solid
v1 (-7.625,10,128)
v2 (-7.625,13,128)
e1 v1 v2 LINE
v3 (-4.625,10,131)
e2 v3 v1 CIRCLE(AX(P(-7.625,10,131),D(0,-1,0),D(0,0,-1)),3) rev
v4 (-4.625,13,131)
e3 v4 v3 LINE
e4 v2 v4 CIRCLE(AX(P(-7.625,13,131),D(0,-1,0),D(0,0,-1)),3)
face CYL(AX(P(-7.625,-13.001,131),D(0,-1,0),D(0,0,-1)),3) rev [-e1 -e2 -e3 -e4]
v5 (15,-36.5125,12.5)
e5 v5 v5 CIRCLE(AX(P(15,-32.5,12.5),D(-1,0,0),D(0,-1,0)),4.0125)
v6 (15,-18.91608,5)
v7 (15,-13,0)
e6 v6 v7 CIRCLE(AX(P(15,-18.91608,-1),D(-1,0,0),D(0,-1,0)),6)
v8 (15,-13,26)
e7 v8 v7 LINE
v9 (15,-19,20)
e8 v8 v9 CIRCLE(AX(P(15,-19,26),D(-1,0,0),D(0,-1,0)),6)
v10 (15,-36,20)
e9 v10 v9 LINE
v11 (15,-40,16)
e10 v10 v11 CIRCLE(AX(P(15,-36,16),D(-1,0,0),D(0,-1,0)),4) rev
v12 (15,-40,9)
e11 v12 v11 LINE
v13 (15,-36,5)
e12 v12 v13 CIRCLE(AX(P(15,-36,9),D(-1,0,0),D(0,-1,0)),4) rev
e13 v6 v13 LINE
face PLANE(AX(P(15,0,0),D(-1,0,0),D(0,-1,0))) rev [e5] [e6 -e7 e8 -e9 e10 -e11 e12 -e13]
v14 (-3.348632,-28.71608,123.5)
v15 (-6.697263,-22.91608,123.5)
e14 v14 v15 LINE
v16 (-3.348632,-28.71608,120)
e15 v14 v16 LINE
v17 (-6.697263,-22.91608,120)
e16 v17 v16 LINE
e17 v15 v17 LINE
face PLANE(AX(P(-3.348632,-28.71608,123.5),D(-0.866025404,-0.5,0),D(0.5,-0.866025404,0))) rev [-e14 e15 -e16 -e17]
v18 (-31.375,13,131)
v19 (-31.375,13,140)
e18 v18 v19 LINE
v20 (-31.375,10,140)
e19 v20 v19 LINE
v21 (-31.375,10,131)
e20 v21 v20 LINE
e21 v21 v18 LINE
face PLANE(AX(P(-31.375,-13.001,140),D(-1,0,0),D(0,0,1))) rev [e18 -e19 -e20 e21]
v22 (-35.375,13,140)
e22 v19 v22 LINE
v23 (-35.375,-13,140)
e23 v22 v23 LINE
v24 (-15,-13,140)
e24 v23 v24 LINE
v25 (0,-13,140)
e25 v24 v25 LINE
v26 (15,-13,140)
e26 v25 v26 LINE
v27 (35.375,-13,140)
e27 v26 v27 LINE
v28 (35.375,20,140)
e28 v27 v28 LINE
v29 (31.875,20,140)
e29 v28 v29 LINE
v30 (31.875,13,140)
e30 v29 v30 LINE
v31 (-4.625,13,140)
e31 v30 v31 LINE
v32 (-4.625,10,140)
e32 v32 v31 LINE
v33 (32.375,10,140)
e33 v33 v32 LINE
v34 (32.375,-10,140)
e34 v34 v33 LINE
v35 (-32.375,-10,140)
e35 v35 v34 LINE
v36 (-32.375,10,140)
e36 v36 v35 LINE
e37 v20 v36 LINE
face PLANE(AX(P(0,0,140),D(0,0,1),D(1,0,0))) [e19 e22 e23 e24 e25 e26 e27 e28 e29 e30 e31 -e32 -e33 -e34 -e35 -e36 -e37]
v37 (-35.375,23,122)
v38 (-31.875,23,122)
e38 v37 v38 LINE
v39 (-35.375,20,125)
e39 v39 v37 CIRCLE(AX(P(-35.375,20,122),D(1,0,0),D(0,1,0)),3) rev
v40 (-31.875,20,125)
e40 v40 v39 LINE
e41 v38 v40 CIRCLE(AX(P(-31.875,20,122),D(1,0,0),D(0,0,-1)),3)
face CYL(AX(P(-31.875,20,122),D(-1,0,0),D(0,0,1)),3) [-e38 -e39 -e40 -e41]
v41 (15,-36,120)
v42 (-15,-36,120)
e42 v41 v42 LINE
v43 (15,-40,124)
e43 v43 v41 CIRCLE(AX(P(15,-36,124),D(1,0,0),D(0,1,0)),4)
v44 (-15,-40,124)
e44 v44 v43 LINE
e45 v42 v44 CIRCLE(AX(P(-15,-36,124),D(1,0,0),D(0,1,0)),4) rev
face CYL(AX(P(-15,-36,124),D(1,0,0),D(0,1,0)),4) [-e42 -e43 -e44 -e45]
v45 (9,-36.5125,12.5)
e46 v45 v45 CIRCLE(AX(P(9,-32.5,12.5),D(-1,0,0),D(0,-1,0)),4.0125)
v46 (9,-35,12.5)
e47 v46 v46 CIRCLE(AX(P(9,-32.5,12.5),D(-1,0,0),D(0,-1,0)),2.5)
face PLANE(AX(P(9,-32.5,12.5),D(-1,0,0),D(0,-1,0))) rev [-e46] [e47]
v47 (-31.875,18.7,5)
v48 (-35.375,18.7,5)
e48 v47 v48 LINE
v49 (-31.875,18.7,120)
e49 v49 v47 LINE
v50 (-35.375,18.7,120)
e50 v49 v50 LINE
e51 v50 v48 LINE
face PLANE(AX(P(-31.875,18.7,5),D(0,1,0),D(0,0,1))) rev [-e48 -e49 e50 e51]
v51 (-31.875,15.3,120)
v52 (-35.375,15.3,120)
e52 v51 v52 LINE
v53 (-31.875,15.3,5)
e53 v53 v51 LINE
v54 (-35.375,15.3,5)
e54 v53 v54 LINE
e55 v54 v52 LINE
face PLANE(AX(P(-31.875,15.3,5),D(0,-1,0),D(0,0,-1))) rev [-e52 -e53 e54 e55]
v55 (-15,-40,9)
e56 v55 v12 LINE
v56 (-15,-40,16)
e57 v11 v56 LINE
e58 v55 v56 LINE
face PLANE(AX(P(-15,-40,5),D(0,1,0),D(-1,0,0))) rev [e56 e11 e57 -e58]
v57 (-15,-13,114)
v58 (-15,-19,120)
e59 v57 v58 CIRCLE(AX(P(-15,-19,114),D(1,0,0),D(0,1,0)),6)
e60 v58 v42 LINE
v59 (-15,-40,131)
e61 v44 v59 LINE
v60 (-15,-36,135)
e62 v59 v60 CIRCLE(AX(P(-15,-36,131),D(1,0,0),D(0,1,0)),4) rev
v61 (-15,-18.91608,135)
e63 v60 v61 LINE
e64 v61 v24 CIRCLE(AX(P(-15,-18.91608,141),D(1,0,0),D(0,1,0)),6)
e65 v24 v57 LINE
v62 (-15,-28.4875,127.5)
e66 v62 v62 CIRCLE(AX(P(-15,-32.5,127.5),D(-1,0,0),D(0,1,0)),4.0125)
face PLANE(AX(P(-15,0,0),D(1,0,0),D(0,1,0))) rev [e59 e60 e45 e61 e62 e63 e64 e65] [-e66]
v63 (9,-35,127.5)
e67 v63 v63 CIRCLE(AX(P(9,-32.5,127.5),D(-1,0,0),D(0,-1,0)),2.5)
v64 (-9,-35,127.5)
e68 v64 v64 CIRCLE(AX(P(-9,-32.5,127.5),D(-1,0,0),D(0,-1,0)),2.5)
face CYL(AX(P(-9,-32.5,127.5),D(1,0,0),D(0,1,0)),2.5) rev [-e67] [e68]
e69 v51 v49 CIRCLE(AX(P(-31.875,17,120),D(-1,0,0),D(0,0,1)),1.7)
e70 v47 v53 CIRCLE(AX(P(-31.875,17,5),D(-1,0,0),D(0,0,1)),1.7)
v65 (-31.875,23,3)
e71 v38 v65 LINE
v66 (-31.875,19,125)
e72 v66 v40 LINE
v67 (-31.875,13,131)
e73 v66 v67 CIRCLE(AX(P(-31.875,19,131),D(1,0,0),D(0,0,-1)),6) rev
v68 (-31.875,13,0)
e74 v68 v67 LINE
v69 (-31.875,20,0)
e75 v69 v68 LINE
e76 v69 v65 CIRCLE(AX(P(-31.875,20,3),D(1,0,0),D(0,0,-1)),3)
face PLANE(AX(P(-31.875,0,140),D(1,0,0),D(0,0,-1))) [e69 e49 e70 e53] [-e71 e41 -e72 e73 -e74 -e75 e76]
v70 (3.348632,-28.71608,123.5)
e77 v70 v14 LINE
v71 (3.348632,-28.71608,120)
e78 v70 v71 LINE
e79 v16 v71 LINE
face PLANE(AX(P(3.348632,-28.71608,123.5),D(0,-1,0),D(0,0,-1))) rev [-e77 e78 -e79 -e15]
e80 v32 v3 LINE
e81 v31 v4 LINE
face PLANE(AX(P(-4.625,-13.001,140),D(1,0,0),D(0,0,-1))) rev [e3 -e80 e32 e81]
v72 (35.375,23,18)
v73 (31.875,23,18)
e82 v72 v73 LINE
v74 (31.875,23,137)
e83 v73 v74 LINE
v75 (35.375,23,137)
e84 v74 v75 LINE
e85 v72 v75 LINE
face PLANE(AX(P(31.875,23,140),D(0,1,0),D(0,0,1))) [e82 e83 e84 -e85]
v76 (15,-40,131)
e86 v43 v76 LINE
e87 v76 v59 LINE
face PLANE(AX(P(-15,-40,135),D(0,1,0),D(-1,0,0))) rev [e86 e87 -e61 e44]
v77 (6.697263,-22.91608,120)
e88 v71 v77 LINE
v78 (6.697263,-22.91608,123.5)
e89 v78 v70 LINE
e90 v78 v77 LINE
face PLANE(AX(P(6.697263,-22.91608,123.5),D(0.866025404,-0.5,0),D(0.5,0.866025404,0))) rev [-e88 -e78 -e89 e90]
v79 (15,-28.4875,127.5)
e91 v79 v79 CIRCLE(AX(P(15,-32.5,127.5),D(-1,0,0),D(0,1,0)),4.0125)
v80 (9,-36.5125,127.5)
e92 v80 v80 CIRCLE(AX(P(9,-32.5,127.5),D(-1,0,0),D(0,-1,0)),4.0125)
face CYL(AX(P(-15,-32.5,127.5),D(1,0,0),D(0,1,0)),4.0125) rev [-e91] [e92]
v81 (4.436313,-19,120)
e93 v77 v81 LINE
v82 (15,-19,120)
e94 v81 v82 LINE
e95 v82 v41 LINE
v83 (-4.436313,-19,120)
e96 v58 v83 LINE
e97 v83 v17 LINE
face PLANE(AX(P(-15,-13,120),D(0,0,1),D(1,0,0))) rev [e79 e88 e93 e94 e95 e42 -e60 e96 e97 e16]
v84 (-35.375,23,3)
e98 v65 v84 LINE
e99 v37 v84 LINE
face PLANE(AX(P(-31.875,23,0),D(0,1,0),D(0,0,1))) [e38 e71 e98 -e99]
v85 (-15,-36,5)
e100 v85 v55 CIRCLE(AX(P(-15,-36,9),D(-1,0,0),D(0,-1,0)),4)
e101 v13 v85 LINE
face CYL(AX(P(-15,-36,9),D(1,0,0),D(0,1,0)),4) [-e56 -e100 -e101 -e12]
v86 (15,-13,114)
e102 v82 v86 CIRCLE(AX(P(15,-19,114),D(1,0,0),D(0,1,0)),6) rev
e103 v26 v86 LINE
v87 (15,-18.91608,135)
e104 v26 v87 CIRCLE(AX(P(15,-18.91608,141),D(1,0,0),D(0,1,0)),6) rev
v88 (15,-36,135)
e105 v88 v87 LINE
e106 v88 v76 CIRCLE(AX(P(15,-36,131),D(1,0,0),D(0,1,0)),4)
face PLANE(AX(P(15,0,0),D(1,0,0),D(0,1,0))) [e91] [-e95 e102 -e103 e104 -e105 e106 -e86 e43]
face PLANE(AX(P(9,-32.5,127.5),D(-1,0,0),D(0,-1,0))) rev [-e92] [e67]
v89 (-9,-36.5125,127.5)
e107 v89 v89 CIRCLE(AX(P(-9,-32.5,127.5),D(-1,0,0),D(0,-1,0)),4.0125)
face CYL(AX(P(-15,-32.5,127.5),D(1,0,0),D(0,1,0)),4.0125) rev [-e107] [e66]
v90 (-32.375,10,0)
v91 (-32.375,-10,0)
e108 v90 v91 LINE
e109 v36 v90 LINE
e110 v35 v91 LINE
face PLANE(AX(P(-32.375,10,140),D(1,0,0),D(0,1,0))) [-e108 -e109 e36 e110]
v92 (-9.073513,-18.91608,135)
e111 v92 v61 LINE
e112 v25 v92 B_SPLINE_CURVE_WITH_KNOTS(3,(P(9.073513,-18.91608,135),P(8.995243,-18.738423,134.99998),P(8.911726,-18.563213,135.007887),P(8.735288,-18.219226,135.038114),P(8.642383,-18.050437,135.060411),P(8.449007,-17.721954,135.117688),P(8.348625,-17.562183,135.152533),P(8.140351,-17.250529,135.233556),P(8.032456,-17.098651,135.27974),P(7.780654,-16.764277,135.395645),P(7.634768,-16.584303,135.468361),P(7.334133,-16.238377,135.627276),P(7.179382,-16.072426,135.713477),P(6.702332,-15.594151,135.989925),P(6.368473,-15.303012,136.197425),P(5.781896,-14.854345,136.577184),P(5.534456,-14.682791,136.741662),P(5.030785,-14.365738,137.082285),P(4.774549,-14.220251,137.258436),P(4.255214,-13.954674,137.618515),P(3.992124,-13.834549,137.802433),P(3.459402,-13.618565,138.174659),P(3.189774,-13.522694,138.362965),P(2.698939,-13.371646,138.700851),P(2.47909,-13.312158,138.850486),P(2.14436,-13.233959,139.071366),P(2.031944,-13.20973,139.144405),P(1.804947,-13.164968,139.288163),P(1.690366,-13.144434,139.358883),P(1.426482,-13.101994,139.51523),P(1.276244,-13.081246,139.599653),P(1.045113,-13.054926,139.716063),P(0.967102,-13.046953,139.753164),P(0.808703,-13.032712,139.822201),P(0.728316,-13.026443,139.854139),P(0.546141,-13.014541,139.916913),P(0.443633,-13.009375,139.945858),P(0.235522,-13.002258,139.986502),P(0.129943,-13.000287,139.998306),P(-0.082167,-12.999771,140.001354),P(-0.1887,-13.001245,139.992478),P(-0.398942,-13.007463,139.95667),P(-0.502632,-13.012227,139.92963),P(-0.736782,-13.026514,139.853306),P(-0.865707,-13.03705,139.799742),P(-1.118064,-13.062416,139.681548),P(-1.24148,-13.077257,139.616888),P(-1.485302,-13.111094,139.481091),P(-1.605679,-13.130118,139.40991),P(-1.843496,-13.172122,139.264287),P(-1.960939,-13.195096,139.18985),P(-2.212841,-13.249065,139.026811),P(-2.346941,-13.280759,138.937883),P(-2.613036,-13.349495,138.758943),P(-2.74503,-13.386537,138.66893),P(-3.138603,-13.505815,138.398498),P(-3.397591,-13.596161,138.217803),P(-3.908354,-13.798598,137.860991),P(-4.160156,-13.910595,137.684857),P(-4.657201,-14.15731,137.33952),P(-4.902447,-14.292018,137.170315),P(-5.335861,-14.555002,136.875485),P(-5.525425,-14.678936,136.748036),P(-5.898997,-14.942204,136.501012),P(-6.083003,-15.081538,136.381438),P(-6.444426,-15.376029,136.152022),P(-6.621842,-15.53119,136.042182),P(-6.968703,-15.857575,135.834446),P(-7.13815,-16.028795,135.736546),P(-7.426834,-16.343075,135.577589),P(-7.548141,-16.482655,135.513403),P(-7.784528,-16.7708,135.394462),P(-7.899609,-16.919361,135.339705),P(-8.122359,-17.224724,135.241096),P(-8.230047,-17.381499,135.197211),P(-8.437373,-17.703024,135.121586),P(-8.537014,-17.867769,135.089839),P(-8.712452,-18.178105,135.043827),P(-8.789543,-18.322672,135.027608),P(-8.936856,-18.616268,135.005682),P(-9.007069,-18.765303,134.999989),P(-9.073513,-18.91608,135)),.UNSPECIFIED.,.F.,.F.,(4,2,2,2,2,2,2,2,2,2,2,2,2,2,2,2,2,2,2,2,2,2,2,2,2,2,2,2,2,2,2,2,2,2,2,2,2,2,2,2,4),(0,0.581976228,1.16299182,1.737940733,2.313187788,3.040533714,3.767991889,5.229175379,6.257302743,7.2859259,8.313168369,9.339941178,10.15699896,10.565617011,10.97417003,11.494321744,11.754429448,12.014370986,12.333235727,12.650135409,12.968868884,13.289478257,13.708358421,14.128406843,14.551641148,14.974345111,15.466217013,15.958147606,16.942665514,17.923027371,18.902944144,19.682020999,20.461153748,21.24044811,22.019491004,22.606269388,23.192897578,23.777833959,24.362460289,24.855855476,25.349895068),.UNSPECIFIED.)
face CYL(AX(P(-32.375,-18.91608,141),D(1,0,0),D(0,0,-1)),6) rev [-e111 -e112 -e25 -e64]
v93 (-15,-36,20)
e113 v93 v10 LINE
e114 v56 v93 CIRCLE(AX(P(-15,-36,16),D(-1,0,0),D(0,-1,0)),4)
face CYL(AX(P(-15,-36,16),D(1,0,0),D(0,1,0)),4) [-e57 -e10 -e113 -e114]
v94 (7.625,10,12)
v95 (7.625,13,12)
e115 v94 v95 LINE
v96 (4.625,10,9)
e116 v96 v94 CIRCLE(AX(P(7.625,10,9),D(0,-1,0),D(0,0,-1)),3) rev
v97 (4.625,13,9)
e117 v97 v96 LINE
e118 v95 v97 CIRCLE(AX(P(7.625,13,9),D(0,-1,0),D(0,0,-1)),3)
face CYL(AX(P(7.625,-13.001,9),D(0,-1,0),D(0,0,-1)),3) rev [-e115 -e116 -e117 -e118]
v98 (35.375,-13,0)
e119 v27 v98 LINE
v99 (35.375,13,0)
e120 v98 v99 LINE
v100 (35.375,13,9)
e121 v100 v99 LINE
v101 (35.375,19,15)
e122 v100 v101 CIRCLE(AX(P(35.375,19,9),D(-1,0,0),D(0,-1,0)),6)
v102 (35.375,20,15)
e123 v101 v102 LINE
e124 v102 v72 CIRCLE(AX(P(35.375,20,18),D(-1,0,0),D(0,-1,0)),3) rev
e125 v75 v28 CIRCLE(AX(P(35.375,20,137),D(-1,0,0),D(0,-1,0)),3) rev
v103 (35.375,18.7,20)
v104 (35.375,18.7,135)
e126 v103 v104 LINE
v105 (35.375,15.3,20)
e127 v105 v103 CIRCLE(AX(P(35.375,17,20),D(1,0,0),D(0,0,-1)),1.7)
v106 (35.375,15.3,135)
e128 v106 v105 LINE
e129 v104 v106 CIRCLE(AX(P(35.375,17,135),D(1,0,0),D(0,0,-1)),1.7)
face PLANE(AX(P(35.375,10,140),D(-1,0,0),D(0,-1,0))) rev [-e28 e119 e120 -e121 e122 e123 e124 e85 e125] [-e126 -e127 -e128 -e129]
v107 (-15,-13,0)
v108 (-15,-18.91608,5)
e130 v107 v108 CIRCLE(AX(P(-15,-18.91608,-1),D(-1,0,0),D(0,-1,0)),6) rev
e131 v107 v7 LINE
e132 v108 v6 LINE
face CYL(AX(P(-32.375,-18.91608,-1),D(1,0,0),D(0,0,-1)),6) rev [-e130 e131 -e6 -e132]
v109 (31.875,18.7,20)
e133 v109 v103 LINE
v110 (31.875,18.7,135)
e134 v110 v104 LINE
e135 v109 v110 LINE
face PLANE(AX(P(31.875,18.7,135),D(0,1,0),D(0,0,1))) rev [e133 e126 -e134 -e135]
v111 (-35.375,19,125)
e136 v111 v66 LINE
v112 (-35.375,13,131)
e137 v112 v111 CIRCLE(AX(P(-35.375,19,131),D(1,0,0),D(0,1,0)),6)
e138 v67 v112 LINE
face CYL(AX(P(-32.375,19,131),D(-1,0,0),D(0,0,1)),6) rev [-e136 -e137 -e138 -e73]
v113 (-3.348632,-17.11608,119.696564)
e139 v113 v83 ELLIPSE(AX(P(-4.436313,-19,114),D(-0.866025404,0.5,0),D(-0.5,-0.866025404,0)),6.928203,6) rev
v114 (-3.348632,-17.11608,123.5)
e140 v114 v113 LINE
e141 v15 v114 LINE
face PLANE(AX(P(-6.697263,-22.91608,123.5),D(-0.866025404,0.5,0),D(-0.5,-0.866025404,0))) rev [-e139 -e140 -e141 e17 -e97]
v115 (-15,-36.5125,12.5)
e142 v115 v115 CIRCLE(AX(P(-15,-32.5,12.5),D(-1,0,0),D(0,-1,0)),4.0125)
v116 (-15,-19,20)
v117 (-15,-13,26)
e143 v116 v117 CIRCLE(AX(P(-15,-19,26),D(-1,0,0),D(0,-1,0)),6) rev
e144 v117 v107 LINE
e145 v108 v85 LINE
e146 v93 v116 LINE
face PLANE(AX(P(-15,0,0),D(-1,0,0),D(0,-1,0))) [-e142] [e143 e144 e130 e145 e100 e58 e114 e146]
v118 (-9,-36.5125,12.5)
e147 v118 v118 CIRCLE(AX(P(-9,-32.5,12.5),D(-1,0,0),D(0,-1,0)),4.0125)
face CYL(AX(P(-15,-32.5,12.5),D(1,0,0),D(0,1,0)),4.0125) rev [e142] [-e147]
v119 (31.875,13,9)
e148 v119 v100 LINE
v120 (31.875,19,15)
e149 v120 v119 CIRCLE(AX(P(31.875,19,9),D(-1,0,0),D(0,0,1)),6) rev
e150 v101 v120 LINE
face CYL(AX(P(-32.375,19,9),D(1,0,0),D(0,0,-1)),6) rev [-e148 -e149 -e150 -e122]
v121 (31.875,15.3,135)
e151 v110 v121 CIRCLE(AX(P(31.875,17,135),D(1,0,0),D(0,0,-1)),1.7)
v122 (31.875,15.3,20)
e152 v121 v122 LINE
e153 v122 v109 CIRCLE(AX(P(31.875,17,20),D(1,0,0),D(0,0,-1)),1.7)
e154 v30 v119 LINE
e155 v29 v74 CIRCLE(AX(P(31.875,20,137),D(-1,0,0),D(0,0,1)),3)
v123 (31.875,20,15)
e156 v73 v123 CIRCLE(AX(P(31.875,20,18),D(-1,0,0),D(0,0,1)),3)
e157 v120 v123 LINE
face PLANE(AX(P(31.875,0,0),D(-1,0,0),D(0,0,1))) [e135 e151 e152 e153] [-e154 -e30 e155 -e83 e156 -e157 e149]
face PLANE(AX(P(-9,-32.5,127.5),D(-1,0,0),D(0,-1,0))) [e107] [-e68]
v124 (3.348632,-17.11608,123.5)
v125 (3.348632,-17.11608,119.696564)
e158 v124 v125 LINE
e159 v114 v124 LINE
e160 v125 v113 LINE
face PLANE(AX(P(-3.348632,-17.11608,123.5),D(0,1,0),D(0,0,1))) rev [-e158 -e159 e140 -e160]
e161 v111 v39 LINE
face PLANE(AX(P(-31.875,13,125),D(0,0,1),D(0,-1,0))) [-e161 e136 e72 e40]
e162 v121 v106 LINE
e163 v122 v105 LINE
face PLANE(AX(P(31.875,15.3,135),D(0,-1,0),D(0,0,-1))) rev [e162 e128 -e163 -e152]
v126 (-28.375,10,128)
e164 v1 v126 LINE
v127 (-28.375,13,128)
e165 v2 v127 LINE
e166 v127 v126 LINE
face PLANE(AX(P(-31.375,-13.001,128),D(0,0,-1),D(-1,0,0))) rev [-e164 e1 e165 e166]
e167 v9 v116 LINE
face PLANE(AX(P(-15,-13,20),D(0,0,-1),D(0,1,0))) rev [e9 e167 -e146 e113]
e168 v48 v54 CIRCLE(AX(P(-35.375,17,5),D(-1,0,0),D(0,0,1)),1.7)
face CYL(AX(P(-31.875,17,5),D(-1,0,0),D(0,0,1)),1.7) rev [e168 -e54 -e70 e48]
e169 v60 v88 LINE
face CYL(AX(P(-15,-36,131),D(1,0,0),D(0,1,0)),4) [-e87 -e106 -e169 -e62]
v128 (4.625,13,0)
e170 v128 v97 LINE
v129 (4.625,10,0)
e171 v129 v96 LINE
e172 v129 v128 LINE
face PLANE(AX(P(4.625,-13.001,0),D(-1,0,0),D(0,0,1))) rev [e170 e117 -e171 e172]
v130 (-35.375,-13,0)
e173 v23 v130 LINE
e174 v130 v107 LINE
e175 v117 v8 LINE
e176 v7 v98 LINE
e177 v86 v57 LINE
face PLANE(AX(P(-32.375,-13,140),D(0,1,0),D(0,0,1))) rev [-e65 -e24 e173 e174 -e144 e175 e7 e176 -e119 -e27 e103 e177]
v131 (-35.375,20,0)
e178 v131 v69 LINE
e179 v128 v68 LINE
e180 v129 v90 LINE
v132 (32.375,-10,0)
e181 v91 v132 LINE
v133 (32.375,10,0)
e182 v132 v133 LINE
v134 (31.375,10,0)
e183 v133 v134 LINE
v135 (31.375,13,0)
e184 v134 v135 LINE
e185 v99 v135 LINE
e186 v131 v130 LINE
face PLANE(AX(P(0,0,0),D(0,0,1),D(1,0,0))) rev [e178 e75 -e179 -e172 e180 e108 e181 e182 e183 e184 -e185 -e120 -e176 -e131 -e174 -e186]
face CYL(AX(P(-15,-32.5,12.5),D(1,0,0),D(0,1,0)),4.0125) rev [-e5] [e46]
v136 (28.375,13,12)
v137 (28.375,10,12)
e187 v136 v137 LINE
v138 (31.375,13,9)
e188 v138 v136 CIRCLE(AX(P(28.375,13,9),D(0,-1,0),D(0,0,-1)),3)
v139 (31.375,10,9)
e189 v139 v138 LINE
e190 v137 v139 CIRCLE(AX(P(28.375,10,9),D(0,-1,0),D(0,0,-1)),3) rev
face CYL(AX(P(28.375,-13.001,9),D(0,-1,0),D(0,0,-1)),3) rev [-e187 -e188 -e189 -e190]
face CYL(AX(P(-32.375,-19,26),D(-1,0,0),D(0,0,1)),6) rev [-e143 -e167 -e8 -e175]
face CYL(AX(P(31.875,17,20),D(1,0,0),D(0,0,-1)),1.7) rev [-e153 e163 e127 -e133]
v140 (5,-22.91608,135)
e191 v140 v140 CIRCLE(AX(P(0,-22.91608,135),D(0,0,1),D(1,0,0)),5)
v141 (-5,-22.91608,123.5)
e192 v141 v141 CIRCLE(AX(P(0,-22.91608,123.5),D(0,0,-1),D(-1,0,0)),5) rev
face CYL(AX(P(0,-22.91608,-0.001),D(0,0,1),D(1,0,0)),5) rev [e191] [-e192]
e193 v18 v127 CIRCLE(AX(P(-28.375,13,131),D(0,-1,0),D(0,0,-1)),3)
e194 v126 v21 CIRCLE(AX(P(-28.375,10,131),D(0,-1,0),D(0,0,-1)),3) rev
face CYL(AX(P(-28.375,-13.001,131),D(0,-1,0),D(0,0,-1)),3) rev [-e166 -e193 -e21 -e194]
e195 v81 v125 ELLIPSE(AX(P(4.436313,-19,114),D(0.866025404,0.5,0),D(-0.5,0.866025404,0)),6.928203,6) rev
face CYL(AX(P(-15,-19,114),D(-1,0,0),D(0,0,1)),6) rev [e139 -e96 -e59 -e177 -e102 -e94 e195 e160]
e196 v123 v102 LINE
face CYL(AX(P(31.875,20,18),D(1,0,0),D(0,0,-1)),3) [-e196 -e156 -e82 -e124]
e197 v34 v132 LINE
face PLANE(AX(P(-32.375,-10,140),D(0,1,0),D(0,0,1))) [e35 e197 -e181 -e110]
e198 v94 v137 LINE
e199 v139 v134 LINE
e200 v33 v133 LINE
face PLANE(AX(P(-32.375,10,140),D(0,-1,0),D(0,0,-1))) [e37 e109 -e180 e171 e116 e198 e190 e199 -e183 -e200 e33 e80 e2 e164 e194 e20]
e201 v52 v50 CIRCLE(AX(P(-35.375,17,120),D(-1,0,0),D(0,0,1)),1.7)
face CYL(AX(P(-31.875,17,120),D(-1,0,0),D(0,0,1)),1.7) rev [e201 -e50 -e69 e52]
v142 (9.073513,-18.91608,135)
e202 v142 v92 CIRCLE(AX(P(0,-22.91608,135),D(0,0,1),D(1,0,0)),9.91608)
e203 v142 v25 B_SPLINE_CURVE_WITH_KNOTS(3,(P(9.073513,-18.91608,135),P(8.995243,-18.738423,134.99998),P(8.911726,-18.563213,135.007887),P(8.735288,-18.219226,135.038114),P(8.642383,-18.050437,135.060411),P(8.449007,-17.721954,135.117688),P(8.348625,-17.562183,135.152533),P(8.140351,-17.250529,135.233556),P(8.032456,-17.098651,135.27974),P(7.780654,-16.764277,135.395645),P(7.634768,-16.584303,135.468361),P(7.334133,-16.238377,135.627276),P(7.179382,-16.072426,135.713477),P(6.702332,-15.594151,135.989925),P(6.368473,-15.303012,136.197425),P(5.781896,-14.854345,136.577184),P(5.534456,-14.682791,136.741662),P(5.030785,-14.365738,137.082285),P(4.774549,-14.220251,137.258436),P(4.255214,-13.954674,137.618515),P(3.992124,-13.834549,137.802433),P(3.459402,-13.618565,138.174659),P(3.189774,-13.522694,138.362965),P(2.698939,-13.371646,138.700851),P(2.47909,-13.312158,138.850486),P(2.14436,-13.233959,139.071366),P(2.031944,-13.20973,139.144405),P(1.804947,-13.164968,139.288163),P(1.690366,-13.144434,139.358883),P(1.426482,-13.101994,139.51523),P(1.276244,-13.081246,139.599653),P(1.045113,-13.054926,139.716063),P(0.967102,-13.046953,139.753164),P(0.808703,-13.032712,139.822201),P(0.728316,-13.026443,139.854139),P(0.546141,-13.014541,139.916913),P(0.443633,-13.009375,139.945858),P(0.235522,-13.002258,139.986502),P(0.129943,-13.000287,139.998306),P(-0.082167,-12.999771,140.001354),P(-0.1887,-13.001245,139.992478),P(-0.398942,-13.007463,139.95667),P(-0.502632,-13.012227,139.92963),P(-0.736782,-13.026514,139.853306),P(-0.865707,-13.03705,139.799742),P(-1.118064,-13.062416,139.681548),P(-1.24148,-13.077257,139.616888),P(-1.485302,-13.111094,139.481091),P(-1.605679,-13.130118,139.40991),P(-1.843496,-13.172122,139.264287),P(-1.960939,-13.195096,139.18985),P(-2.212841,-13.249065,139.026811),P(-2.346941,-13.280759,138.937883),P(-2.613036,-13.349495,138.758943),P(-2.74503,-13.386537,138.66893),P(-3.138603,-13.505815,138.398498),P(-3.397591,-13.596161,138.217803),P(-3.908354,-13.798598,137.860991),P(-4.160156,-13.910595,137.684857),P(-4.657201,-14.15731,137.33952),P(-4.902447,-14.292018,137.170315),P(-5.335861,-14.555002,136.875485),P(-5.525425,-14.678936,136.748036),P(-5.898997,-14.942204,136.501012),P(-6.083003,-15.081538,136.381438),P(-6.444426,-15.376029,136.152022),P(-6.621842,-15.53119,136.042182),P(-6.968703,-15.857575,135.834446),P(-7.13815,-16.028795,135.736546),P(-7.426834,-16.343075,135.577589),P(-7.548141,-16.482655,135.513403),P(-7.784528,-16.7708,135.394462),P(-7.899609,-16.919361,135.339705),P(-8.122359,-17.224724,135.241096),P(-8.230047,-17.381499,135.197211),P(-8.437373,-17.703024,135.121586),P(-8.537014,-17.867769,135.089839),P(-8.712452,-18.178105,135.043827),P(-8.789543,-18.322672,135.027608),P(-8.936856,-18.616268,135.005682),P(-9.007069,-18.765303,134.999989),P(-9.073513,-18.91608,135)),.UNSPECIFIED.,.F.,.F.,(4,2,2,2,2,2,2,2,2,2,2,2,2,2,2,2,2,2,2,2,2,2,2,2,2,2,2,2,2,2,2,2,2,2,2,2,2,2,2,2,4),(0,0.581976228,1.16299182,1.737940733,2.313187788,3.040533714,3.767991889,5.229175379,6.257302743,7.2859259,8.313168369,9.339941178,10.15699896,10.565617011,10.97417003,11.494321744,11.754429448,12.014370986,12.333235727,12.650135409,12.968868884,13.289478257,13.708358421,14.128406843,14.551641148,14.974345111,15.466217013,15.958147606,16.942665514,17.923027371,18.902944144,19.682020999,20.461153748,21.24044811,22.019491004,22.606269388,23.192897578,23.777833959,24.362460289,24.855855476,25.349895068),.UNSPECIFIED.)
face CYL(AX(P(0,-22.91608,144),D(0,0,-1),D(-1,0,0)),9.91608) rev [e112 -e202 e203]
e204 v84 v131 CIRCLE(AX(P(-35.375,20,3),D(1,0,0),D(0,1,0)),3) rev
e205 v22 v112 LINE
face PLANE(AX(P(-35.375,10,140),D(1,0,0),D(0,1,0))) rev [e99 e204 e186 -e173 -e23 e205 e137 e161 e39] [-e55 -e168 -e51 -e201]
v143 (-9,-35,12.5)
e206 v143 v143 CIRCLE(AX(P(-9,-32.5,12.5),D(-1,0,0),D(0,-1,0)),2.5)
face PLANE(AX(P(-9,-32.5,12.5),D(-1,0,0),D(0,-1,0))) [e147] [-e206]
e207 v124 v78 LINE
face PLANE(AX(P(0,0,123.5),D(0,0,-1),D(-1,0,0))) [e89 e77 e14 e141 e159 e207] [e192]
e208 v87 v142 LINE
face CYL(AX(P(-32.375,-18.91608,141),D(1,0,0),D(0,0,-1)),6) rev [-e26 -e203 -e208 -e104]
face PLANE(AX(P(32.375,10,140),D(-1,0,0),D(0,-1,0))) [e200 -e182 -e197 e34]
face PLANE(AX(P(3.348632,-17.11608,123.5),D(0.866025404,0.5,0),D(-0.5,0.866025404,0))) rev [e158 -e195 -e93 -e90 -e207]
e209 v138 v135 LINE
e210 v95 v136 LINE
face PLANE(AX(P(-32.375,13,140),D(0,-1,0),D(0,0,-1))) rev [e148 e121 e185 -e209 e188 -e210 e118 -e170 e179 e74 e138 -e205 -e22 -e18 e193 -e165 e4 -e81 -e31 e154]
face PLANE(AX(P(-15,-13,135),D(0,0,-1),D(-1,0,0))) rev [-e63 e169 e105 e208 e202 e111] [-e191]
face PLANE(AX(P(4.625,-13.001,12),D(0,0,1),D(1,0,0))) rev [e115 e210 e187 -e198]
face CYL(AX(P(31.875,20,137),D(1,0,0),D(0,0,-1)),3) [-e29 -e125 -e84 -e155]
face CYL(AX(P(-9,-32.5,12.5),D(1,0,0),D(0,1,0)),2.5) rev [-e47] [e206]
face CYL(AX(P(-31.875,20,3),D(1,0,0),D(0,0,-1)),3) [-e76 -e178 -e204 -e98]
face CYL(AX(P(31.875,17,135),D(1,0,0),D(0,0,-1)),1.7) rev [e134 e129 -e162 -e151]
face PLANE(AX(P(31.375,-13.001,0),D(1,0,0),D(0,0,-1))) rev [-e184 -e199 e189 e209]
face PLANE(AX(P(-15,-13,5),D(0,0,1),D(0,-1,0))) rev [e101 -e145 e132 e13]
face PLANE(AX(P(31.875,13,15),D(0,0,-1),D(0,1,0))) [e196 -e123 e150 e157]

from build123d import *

# Parameters (mm, degrees)
SKETCH1_W            = 64.75
SKETCH1_H            = 20
BODY_DEPTH           = 140
SHELL1_T             = 3
SWITCH_CUTOUT_REACH  = 148.722
SKETCH2_W            = 26.75
SKETCH2_H            = 12
SKETCH4_W            = 15
SKETCH4_H            = 27
SKETCH4_R            = 4.0125
AXLE_HOLDER_DEPTH    = 15
SKETCH5_R            = 4.0125
SKETCH5_R_2          = 2.5
BUSHING_HOLDER_DEPTH = 9
FILLET3_R            = 4
FILLET4_R            = 6
SKETCH6_W            = 125
SKETCH6_H            = 10
SLIDE_MOUNT_DEPTH    = 3.5
CIRPATTERN1_COUNT    = 2
FILLET6_R            = 3
FILLET7_R            = 3
FILLET8_R            = 6
CUT_EXTRUDE1_REACH   = 147.177
SKETCH7_R            = 5
SKETCH8_R            = 9.916079783
CUT_EXTRUDE2_DEPTH   = 9
CUT_EXTRUDE3_DEPTH   = 3.5


with BuildPart() as part:
    # Sketch1 → Body (new body)
    with BuildSketch(Plane.XY):
        Rectangle(SKETCH1_W, SKETCH1_H)
    extrude(amount=BODY_DEPTH)

    # Shell1
    shell1_openings = [part.faces().sort_by_distance(p)[0] for p in [
        (0, 0, 0),
        (0, 0, 140),
    ]]
    offset(amount=SHELL1_T, openings=shell1_openings, kind=Kind.INTERSECTION)

    # Sketch2 → Switch_cutout (cut, up to next)
    with BuildSketch(Plane(origin=(0, 13, 0), x_dir=(1, 0, 0), z_dir=(0, 1, 0)), mode=Mode.PRIVATE) as switch_cutout_sk1:
        with Locations((18, -6)):
            Rectangle(SKETCH2_W, SKETCH2_H)
    switch_cutout_tool1 = extrude(switch_cutout_sk1.sketch, amount=-SWITCH_CUTOUT_REACH, mode=Mode.PRIVATE) & part.part
    # Sketch2 → Switch_cutout (cut, up to next)
    with BuildSketch(Plane(origin=(0, 13, 0), x_dir=(1, 0, 0), z_dir=(0, 1, 0)), mode=Mode.PRIVATE) as switch_cutout_sk2:
        with Locations((-18, -134)):
            Rectangle(SKETCH2_W, SKETCH2_H)
    switch_cutout_tool2 = extrude(switch_cutout_sk2.sketch, amount=-SWITCH_CUTOUT_REACH, mode=Mode.PRIVATE) & part.part
    add(switch_cutout_tool1.solids().sort_by_distance((18, 13, 6))[0], mode=Mode.SUBTRACT)
    add(switch_cutout_tool2.solids().sort_by_distance((-18, 13, 134))[0], mode=Mode.SUBTRACT)

    # Sketch4 → Axle_holder (add, symmetric)
    # profile 1 of 2: a face of its own
    with BuildSketch(Plane.ZY):
        with Locations((12.5, -26.5)):
            Rectangle(SKETCH4_W, SKETCH4_H)
        with Locations(Location((12.5, -32.5, 0), (0, 0, 270))):
            Circle(SKETCH4_R, mode=Mode.SUBTRACT)
    # profile 2 of 2: a face of its own
    with BuildSketch(Plane.ZY):
        with Locations((127.5, -26.5)):
            Rectangle(SKETCH4_W, SKETCH4_H)
        with Locations(Location((127.5, -32.5, 0), (0, 0, 90))):
            Circle(SKETCH4_R, mode=Mode.SUBTRACT)
    extrude(amount=AXLE_HOLDER_DEPTH, both=True)

    # Sketch5 → Bushing_holder (add, symmetric)
    # profile 1 of 2: a face of its own
    with BuildSketch(Plane.ZY):
        with Locations(Location((12.5, -32.5, 0), (0, 0, 270))):
            Circle(SKETCH5_R)
        with Locations(Location((12.5, -32.5, 0), (0, 0, 270))):
            Circle(SKETCH5_R_2, mode=Mode.SUBTRACT)
    # profile 2 of 2: a face of its own
    with BuildSketch(Plane.ZY):
        with Locations(Location((127.5, -32.5, 0), (0, 0, 90))):
            Circle(SKETCH5_R)
        with Locations(Location((127.5, -32.5, 0), (0, 0, 270))):
            Circle(SKETCH5_R_2, mode=Mode.SUBTRACT)
    extrude(amount=BUSHING_HOLDER_DEPTH, both=True)

    # Fillet3
    fillet3_edges = [part.edges().sort_by_distance(p)[0] for p in [
        (0, -40, 5),
        (0, -40, 20),
        (0, -40, 135),
        (0, -40, 120),
    ]]
    fillet(fillet3_edges, radius=FILLET3_R)

    # Fillet4
    # the kernel refuses this fillet: 6 mm, written as the material it adds along each edge
    with BuildSketch(Plane(origin=(15, -13, 5), x_dir=(0, 0, -1), z_dir=(-1, 0, 0))) as fillet4_piece_1:
        with BuildLine():
            CenterArc((6, 5.916079783), FILLET4_R, 180, 80.405931773)
            Line((0, 5.916079783), (-0.12, 5.916079783))
            Line((-0.12, 5.916079783), (-0.12, 0))
            Line((-0.12, 0), (0, -0.12))
            ThreePointArc((0, -0.12), (2.5, -0.12), (4.98, -0.118321596))
            Line((4.98, -0.118321596), (5, 0))
        make_face()
    extrude(amount=30)
    with BuildSketch(Plane(origin=(-15, -13, 20), x_dir=(0, 0, 1), z_dir=(1, 0, 0)), Plane(origin=(-15, -13, 120), x_dir=(0, -1, 0), z_dir=(1, 0, 0))) as fillet4_piece_2:
        with BuildLine():
            CenterArc((FILLET4_R, FILLET4_R), FILLET4_R, 180, 90)
            Line((0, FILLET4_R), (-FILLET4_R * 0.02, FILLET4_R))
            Line((-FILLET4_R * 0.02, FILLET4_R), (-FILLET4_R * 0.02, -FILLET4_R * 0.02))
            Line((-FILLET4_R * 0.02, -FILLET4_R * 0.02), (FILLET4_R, -FILLET4_R * 0.02))
            Line((FILLET4_R, -FILLET4_R * 0.02), (FILLET4_R, 0))
        make_face()
    extrude(amount=30)
    with BuildSketch(Plane(origin=(15, -13, 135), x_dir=(0, 0, 1), z_dir=(-1, 0, 0))) as fillet4_piece_3:
        with BuildLine():
            CenterArc((6, -5.916079783), FILLET4_R, 99.594068227, 80.405931773)
            Line((0, -5.916079783), (-0.12, -5.916079783))
            Line((-0.12, -5.916079783), (-0.12, 0))
            Line((-0.12, 0), (0, 0.12))
            ThreePointArc((0, 0.12), (2.5, 0.12), (4.98, 0.118321596))
            Line((4.98, 0.118321596), (5, 0))
        make_face()
    extrude(amount=30)

    # Sketch6 → Slide_mount (add)
    with BuildSketch(Plane(origin=(35.375, 0, 0), x_dir=(0, 0, -1), z_dir=(1, 0, 0))):
        with Locations((-77.5, 18)):
            Rectangle(SKETCH6_W, SKETCH6_H)
        with BuildLine():
            Line((-135, 18.7), (-20, 18.7))
            ThreePointArc((-20, 18.7), (-18.3, 17), (-20, 15.3))
            Line((-20, 15.3), (-135, 15.3))
            ThreePointArc((-135, 15.3), (-136.7, 17), (-135, 18.7))
        make_face(mode=Mode.SUBTRACT)
    slide_mount = extrude(amount=-SLIDE_MOUNT_DEPTH)

    # CirPattern1: Slide_mount ×2 about axis
    cirpattern1_axis = Axis((0, 0, 70), (0, 1, 0))
    for i in range(1, CIRPATTERN1_COUNT):
        add(slide_mount.rotate(cirpattern1_axis, i * 360 / CIRPATTERN1_COUNT))

    # Fillet6
    fillet6_edges = [part.edges().sort_by_distance(p)[0] for p in [
        (33.625, 23, 140),
        (33.625, 23, 15),
        (-33.625, 23, 0),
        (-33.625, 23, 125),
    ]]
    fillet(fillet6_edges, radius=FILLET6_R)

    # Fillet7
    fillet7_edges = [part.edges().sort_by_distance(p)[0] for p in [
        (4.625, 11.5, 12),
        (31.375, 11.5, 12),
        (-31.375, 11.5, 128),
        (-4.625, 11.5, 128),
    ]]
    fillet(fillet7_edges, radius=FILLET7_R)

    # Fillet8
    fillet8_edges = [part.edges().sort_by_distance(p)[0] for p in [
        (33.625, 13, 15),
        (-33.625, 13, 125),
    ]]
    fillet(fillet8_edges, radius=FILLET8_R)

    # Sketch7 → Cut-Extrude1 (cut, up to next)
    with BuildSketch(Plane.XY.offset(135), mode=Mode.PRIVATE) as cut_extrude1_sk1:
        with Locations(Location((0, -22.916079783, 0), (0, 0, 51.555975818))):
            Circle(SKETCH7_R)
    cut_extrude1_tool1 = extrude(cut_extrude1_sk1.sketch, amount=-CUT_EXTRUDE1_REACH, mode=Mode.PRIVATE) & part.part
    add(cut_extrude1_tool1.solids().sort_by_distance((0, -22.91608, 135))[0], mode=Mode.SUBTRACT)

    # Sketch8 → Cut-Extrude2 (cut)
    with BuildSketch(Plane.XY.offset(135)):
        with Locations((0, -22.916079783)):
            Circle(SKETCH8_R)
    extrude(amount=CUT_EXTRUDE2_DEPTH, mode=Mode.SUBTRACT)

    # Sketch9 → Cut-Extrude3 (cut, symmetric)
    with BuildSketch(Plane(origin=(0, 0, 120), x_dir=(-1, 0, 0), z_dir=(0, 0, -1))):
        Polygon((-6.697263123, -22.916079783), (-3.348631561, -28.716079783), (3.348631561, -28.716079783), (6.697263123, -22.916079783), (3.348631561, -17.116079783), (-3.348631561, -17.116079783), align=None)
    extrude(amount=CUT_EXTRUDE3_DEPTH, both=True, mode=Mode.SUBTRACT)


solid = part.part
